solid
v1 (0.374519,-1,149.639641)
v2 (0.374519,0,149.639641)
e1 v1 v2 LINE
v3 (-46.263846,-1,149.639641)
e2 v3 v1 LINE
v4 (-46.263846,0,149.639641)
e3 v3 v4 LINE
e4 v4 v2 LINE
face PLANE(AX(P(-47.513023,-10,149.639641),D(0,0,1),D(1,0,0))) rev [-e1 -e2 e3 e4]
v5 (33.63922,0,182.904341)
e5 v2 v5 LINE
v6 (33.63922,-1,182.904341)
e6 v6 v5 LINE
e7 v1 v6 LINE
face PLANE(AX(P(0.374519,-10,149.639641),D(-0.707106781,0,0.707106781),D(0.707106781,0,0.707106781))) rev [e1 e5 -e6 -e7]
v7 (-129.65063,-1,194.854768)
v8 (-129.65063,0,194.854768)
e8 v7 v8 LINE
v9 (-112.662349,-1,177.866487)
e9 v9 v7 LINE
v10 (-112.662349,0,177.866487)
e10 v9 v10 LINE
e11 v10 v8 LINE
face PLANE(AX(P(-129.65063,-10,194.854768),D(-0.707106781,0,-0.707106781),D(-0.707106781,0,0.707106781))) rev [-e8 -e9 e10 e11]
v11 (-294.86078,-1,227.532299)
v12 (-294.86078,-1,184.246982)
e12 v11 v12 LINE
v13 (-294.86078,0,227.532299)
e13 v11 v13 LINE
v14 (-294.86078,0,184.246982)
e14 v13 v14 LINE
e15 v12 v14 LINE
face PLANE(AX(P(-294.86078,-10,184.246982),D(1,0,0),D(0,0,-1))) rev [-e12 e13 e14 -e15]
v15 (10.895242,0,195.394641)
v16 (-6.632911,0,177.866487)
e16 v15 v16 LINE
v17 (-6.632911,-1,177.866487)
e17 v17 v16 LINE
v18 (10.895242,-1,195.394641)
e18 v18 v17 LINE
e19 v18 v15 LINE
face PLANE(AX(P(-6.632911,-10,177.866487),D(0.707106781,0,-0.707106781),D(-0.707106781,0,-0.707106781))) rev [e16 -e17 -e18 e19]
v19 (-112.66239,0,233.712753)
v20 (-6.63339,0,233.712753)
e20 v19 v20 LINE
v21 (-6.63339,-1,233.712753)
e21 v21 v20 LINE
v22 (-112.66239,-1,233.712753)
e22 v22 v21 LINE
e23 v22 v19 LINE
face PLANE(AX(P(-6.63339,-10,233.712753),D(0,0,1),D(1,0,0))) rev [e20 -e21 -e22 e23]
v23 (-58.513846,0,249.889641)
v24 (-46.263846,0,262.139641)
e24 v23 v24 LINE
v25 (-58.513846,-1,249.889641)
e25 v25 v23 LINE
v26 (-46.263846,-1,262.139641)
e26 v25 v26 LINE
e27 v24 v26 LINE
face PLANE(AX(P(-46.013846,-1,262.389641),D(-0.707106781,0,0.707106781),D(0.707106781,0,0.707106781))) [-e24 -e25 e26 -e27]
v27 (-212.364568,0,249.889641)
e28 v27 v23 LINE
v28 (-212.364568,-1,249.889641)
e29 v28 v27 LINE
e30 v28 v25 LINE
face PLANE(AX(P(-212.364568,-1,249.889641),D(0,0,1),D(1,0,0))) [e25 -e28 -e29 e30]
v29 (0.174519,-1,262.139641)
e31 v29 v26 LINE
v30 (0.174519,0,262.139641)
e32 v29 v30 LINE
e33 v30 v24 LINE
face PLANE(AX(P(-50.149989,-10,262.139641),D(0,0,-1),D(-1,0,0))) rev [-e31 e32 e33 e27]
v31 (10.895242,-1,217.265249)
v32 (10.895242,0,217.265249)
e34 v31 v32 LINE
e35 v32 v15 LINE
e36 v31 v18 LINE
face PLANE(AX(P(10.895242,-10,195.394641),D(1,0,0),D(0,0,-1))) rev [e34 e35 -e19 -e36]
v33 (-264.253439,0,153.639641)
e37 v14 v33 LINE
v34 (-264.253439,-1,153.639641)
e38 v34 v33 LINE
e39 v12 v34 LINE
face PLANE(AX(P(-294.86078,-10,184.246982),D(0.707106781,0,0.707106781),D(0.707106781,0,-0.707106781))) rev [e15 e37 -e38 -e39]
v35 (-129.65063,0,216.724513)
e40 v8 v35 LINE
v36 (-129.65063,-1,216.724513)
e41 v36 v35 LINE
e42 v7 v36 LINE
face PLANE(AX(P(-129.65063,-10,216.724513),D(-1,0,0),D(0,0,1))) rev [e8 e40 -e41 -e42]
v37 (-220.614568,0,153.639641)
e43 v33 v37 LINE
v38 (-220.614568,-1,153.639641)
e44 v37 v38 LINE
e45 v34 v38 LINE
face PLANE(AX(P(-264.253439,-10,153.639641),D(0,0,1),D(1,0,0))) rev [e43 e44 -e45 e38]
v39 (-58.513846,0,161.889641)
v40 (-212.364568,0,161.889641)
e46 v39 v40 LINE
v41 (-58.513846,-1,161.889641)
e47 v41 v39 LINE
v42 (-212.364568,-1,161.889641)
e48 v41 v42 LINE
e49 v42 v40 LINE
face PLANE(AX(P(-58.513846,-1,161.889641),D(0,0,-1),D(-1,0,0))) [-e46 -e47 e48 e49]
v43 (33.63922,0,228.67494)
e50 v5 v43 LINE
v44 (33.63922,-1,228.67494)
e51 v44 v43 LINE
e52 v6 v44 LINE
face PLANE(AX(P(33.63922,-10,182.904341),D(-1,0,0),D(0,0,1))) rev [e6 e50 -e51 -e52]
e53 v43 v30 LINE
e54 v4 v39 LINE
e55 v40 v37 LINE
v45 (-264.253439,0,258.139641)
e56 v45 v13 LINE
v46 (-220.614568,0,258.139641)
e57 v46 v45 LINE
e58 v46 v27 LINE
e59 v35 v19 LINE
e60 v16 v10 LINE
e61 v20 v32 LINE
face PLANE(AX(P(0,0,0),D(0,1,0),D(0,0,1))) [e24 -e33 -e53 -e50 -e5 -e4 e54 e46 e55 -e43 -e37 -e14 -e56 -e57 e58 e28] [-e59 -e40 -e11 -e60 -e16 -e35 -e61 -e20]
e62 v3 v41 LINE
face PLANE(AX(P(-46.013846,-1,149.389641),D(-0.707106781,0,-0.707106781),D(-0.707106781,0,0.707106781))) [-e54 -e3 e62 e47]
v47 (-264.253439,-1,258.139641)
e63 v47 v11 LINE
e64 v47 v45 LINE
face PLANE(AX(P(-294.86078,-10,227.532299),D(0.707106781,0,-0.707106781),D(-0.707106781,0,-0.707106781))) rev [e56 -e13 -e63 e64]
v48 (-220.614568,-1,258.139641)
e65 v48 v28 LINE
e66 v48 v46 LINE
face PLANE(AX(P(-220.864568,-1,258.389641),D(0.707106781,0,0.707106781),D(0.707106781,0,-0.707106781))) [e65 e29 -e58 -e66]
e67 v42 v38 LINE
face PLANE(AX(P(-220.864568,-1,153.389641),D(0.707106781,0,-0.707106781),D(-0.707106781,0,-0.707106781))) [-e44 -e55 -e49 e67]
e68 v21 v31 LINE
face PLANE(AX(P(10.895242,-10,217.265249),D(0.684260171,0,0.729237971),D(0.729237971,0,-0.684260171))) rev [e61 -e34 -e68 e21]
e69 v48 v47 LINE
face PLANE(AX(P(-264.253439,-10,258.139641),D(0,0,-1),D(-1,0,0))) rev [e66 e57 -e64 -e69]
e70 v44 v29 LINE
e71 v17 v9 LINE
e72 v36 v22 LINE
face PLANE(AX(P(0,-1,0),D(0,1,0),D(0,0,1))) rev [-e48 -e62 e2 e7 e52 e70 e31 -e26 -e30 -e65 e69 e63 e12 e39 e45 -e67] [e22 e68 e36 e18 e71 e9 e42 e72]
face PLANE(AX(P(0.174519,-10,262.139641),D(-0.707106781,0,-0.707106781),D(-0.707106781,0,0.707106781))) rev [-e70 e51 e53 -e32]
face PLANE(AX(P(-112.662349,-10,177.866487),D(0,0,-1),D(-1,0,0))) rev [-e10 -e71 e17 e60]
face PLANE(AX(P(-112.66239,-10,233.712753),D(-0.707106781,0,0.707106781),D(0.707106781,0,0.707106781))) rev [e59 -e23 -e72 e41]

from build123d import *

# Parameters (mm, degrees)
SM_BASE_FLANGE_1_DEPTH = 1
CUT_EXTRUDE_1_DEPTH    = 10
CUT_EXTRUDE_2_DEPTH    = 10


# Sheet-metal steps are written as plain solids
with BuildPart() as part:
    # Sketch 1 → Базовая кромка1 (new body)
    with BuildSketch(Plane(origin=(0, 0, 0), x_dir=(1, 0, 0), z_dir=(0, 1, 0))):
        Polygon((-58.513846144, -161.889640506), (-212.364567845, -161.889640506), (-220.864567845, -153.389640506), (-222.278781408, -153.389640506), (-264.356991895, -153.389640506), (-295.11077987, -184.143428482), (-295.11077987, -227.635852531), (-264.356991895, -258.389640506), (-222.278781408, -258.389640506), (-220.864567845, -258.389640506), (-212.364567845, -249.889640506), (-58.513846144, -249.889640506), (-46.013846144, -262.389640506), (-44.599632582, -262.389640506), (0.278072842, -262.389640506), (33.88922013, -228.778493218), (33.88922013, -182.800787794), (0.478072842, -149.389640506), (-44.599632582, -149.389640506), (-46.013846144, -149.389640506), align=None)
    extrude(amount=-SM_BASE_FLANGE_1_DEPTH)

    # Эскиз3 → Вырез-Вытянуть1 (cut)
    with BuildSketch(Plane(origin=(0, 0, 0), x_dir=(1, 0, 0), z_dir=(0, 1, 0))):
        Polygon((-129.650630124, -194.854768426), (-112.66234875, -177.866487052), (-6.632911498, -177.866487052), (10.895241956, -195.394640506), (10.895241956, -217.265248922), (-6.633389706, -233.712753004), (-112.662389706, -233.712753004), (-129.650630124, -216.724512586), align=None)
    extrude(amount=-CUT_EXTRUDE_1_DEPTH, mode=Mode.SUBTRACT)

    # Эскиз4 → Вырез-Вытянуть2 (cut)
    with BuildSketch(Plane(origin=(0, 0, 0), x_dir=(1, 0, 0), z_dir=(0, 1, 0))):
        Polygon((-264.253438504, -153.639640506), (-216.125737308, -153.639640506), (-216.125737308, -129.066031108), (-310.48708542, -129.066031108), (-310.48708542, -280.318410607), (-216.781479831, -280.318410607), (-216.781479831, -258.139640506), (-264.253438504, -258.139640506), (-294.86077987, -227.53229914), (-294.86077987, -184.246981872), align=None)
        Polygon((-47.513022755, -149.639640506), (0.374519451, -149.639640506), (33.63922013, -182.904341185), (33.63922013, -228.674939827), (0.174519451, -262.139640506), (-50.1499885, -262.139640506), (-50.1499885, -286.805350845), (64.547971273, -286.805350845), (64.547971273, -129.066031108), (-47.513022755, -129.066031108), align=None)
    extrude(amount=-CUT_EXTRUDE_2_DEPTH, mode=Mode.SUBTRACT)


solid = part.part
